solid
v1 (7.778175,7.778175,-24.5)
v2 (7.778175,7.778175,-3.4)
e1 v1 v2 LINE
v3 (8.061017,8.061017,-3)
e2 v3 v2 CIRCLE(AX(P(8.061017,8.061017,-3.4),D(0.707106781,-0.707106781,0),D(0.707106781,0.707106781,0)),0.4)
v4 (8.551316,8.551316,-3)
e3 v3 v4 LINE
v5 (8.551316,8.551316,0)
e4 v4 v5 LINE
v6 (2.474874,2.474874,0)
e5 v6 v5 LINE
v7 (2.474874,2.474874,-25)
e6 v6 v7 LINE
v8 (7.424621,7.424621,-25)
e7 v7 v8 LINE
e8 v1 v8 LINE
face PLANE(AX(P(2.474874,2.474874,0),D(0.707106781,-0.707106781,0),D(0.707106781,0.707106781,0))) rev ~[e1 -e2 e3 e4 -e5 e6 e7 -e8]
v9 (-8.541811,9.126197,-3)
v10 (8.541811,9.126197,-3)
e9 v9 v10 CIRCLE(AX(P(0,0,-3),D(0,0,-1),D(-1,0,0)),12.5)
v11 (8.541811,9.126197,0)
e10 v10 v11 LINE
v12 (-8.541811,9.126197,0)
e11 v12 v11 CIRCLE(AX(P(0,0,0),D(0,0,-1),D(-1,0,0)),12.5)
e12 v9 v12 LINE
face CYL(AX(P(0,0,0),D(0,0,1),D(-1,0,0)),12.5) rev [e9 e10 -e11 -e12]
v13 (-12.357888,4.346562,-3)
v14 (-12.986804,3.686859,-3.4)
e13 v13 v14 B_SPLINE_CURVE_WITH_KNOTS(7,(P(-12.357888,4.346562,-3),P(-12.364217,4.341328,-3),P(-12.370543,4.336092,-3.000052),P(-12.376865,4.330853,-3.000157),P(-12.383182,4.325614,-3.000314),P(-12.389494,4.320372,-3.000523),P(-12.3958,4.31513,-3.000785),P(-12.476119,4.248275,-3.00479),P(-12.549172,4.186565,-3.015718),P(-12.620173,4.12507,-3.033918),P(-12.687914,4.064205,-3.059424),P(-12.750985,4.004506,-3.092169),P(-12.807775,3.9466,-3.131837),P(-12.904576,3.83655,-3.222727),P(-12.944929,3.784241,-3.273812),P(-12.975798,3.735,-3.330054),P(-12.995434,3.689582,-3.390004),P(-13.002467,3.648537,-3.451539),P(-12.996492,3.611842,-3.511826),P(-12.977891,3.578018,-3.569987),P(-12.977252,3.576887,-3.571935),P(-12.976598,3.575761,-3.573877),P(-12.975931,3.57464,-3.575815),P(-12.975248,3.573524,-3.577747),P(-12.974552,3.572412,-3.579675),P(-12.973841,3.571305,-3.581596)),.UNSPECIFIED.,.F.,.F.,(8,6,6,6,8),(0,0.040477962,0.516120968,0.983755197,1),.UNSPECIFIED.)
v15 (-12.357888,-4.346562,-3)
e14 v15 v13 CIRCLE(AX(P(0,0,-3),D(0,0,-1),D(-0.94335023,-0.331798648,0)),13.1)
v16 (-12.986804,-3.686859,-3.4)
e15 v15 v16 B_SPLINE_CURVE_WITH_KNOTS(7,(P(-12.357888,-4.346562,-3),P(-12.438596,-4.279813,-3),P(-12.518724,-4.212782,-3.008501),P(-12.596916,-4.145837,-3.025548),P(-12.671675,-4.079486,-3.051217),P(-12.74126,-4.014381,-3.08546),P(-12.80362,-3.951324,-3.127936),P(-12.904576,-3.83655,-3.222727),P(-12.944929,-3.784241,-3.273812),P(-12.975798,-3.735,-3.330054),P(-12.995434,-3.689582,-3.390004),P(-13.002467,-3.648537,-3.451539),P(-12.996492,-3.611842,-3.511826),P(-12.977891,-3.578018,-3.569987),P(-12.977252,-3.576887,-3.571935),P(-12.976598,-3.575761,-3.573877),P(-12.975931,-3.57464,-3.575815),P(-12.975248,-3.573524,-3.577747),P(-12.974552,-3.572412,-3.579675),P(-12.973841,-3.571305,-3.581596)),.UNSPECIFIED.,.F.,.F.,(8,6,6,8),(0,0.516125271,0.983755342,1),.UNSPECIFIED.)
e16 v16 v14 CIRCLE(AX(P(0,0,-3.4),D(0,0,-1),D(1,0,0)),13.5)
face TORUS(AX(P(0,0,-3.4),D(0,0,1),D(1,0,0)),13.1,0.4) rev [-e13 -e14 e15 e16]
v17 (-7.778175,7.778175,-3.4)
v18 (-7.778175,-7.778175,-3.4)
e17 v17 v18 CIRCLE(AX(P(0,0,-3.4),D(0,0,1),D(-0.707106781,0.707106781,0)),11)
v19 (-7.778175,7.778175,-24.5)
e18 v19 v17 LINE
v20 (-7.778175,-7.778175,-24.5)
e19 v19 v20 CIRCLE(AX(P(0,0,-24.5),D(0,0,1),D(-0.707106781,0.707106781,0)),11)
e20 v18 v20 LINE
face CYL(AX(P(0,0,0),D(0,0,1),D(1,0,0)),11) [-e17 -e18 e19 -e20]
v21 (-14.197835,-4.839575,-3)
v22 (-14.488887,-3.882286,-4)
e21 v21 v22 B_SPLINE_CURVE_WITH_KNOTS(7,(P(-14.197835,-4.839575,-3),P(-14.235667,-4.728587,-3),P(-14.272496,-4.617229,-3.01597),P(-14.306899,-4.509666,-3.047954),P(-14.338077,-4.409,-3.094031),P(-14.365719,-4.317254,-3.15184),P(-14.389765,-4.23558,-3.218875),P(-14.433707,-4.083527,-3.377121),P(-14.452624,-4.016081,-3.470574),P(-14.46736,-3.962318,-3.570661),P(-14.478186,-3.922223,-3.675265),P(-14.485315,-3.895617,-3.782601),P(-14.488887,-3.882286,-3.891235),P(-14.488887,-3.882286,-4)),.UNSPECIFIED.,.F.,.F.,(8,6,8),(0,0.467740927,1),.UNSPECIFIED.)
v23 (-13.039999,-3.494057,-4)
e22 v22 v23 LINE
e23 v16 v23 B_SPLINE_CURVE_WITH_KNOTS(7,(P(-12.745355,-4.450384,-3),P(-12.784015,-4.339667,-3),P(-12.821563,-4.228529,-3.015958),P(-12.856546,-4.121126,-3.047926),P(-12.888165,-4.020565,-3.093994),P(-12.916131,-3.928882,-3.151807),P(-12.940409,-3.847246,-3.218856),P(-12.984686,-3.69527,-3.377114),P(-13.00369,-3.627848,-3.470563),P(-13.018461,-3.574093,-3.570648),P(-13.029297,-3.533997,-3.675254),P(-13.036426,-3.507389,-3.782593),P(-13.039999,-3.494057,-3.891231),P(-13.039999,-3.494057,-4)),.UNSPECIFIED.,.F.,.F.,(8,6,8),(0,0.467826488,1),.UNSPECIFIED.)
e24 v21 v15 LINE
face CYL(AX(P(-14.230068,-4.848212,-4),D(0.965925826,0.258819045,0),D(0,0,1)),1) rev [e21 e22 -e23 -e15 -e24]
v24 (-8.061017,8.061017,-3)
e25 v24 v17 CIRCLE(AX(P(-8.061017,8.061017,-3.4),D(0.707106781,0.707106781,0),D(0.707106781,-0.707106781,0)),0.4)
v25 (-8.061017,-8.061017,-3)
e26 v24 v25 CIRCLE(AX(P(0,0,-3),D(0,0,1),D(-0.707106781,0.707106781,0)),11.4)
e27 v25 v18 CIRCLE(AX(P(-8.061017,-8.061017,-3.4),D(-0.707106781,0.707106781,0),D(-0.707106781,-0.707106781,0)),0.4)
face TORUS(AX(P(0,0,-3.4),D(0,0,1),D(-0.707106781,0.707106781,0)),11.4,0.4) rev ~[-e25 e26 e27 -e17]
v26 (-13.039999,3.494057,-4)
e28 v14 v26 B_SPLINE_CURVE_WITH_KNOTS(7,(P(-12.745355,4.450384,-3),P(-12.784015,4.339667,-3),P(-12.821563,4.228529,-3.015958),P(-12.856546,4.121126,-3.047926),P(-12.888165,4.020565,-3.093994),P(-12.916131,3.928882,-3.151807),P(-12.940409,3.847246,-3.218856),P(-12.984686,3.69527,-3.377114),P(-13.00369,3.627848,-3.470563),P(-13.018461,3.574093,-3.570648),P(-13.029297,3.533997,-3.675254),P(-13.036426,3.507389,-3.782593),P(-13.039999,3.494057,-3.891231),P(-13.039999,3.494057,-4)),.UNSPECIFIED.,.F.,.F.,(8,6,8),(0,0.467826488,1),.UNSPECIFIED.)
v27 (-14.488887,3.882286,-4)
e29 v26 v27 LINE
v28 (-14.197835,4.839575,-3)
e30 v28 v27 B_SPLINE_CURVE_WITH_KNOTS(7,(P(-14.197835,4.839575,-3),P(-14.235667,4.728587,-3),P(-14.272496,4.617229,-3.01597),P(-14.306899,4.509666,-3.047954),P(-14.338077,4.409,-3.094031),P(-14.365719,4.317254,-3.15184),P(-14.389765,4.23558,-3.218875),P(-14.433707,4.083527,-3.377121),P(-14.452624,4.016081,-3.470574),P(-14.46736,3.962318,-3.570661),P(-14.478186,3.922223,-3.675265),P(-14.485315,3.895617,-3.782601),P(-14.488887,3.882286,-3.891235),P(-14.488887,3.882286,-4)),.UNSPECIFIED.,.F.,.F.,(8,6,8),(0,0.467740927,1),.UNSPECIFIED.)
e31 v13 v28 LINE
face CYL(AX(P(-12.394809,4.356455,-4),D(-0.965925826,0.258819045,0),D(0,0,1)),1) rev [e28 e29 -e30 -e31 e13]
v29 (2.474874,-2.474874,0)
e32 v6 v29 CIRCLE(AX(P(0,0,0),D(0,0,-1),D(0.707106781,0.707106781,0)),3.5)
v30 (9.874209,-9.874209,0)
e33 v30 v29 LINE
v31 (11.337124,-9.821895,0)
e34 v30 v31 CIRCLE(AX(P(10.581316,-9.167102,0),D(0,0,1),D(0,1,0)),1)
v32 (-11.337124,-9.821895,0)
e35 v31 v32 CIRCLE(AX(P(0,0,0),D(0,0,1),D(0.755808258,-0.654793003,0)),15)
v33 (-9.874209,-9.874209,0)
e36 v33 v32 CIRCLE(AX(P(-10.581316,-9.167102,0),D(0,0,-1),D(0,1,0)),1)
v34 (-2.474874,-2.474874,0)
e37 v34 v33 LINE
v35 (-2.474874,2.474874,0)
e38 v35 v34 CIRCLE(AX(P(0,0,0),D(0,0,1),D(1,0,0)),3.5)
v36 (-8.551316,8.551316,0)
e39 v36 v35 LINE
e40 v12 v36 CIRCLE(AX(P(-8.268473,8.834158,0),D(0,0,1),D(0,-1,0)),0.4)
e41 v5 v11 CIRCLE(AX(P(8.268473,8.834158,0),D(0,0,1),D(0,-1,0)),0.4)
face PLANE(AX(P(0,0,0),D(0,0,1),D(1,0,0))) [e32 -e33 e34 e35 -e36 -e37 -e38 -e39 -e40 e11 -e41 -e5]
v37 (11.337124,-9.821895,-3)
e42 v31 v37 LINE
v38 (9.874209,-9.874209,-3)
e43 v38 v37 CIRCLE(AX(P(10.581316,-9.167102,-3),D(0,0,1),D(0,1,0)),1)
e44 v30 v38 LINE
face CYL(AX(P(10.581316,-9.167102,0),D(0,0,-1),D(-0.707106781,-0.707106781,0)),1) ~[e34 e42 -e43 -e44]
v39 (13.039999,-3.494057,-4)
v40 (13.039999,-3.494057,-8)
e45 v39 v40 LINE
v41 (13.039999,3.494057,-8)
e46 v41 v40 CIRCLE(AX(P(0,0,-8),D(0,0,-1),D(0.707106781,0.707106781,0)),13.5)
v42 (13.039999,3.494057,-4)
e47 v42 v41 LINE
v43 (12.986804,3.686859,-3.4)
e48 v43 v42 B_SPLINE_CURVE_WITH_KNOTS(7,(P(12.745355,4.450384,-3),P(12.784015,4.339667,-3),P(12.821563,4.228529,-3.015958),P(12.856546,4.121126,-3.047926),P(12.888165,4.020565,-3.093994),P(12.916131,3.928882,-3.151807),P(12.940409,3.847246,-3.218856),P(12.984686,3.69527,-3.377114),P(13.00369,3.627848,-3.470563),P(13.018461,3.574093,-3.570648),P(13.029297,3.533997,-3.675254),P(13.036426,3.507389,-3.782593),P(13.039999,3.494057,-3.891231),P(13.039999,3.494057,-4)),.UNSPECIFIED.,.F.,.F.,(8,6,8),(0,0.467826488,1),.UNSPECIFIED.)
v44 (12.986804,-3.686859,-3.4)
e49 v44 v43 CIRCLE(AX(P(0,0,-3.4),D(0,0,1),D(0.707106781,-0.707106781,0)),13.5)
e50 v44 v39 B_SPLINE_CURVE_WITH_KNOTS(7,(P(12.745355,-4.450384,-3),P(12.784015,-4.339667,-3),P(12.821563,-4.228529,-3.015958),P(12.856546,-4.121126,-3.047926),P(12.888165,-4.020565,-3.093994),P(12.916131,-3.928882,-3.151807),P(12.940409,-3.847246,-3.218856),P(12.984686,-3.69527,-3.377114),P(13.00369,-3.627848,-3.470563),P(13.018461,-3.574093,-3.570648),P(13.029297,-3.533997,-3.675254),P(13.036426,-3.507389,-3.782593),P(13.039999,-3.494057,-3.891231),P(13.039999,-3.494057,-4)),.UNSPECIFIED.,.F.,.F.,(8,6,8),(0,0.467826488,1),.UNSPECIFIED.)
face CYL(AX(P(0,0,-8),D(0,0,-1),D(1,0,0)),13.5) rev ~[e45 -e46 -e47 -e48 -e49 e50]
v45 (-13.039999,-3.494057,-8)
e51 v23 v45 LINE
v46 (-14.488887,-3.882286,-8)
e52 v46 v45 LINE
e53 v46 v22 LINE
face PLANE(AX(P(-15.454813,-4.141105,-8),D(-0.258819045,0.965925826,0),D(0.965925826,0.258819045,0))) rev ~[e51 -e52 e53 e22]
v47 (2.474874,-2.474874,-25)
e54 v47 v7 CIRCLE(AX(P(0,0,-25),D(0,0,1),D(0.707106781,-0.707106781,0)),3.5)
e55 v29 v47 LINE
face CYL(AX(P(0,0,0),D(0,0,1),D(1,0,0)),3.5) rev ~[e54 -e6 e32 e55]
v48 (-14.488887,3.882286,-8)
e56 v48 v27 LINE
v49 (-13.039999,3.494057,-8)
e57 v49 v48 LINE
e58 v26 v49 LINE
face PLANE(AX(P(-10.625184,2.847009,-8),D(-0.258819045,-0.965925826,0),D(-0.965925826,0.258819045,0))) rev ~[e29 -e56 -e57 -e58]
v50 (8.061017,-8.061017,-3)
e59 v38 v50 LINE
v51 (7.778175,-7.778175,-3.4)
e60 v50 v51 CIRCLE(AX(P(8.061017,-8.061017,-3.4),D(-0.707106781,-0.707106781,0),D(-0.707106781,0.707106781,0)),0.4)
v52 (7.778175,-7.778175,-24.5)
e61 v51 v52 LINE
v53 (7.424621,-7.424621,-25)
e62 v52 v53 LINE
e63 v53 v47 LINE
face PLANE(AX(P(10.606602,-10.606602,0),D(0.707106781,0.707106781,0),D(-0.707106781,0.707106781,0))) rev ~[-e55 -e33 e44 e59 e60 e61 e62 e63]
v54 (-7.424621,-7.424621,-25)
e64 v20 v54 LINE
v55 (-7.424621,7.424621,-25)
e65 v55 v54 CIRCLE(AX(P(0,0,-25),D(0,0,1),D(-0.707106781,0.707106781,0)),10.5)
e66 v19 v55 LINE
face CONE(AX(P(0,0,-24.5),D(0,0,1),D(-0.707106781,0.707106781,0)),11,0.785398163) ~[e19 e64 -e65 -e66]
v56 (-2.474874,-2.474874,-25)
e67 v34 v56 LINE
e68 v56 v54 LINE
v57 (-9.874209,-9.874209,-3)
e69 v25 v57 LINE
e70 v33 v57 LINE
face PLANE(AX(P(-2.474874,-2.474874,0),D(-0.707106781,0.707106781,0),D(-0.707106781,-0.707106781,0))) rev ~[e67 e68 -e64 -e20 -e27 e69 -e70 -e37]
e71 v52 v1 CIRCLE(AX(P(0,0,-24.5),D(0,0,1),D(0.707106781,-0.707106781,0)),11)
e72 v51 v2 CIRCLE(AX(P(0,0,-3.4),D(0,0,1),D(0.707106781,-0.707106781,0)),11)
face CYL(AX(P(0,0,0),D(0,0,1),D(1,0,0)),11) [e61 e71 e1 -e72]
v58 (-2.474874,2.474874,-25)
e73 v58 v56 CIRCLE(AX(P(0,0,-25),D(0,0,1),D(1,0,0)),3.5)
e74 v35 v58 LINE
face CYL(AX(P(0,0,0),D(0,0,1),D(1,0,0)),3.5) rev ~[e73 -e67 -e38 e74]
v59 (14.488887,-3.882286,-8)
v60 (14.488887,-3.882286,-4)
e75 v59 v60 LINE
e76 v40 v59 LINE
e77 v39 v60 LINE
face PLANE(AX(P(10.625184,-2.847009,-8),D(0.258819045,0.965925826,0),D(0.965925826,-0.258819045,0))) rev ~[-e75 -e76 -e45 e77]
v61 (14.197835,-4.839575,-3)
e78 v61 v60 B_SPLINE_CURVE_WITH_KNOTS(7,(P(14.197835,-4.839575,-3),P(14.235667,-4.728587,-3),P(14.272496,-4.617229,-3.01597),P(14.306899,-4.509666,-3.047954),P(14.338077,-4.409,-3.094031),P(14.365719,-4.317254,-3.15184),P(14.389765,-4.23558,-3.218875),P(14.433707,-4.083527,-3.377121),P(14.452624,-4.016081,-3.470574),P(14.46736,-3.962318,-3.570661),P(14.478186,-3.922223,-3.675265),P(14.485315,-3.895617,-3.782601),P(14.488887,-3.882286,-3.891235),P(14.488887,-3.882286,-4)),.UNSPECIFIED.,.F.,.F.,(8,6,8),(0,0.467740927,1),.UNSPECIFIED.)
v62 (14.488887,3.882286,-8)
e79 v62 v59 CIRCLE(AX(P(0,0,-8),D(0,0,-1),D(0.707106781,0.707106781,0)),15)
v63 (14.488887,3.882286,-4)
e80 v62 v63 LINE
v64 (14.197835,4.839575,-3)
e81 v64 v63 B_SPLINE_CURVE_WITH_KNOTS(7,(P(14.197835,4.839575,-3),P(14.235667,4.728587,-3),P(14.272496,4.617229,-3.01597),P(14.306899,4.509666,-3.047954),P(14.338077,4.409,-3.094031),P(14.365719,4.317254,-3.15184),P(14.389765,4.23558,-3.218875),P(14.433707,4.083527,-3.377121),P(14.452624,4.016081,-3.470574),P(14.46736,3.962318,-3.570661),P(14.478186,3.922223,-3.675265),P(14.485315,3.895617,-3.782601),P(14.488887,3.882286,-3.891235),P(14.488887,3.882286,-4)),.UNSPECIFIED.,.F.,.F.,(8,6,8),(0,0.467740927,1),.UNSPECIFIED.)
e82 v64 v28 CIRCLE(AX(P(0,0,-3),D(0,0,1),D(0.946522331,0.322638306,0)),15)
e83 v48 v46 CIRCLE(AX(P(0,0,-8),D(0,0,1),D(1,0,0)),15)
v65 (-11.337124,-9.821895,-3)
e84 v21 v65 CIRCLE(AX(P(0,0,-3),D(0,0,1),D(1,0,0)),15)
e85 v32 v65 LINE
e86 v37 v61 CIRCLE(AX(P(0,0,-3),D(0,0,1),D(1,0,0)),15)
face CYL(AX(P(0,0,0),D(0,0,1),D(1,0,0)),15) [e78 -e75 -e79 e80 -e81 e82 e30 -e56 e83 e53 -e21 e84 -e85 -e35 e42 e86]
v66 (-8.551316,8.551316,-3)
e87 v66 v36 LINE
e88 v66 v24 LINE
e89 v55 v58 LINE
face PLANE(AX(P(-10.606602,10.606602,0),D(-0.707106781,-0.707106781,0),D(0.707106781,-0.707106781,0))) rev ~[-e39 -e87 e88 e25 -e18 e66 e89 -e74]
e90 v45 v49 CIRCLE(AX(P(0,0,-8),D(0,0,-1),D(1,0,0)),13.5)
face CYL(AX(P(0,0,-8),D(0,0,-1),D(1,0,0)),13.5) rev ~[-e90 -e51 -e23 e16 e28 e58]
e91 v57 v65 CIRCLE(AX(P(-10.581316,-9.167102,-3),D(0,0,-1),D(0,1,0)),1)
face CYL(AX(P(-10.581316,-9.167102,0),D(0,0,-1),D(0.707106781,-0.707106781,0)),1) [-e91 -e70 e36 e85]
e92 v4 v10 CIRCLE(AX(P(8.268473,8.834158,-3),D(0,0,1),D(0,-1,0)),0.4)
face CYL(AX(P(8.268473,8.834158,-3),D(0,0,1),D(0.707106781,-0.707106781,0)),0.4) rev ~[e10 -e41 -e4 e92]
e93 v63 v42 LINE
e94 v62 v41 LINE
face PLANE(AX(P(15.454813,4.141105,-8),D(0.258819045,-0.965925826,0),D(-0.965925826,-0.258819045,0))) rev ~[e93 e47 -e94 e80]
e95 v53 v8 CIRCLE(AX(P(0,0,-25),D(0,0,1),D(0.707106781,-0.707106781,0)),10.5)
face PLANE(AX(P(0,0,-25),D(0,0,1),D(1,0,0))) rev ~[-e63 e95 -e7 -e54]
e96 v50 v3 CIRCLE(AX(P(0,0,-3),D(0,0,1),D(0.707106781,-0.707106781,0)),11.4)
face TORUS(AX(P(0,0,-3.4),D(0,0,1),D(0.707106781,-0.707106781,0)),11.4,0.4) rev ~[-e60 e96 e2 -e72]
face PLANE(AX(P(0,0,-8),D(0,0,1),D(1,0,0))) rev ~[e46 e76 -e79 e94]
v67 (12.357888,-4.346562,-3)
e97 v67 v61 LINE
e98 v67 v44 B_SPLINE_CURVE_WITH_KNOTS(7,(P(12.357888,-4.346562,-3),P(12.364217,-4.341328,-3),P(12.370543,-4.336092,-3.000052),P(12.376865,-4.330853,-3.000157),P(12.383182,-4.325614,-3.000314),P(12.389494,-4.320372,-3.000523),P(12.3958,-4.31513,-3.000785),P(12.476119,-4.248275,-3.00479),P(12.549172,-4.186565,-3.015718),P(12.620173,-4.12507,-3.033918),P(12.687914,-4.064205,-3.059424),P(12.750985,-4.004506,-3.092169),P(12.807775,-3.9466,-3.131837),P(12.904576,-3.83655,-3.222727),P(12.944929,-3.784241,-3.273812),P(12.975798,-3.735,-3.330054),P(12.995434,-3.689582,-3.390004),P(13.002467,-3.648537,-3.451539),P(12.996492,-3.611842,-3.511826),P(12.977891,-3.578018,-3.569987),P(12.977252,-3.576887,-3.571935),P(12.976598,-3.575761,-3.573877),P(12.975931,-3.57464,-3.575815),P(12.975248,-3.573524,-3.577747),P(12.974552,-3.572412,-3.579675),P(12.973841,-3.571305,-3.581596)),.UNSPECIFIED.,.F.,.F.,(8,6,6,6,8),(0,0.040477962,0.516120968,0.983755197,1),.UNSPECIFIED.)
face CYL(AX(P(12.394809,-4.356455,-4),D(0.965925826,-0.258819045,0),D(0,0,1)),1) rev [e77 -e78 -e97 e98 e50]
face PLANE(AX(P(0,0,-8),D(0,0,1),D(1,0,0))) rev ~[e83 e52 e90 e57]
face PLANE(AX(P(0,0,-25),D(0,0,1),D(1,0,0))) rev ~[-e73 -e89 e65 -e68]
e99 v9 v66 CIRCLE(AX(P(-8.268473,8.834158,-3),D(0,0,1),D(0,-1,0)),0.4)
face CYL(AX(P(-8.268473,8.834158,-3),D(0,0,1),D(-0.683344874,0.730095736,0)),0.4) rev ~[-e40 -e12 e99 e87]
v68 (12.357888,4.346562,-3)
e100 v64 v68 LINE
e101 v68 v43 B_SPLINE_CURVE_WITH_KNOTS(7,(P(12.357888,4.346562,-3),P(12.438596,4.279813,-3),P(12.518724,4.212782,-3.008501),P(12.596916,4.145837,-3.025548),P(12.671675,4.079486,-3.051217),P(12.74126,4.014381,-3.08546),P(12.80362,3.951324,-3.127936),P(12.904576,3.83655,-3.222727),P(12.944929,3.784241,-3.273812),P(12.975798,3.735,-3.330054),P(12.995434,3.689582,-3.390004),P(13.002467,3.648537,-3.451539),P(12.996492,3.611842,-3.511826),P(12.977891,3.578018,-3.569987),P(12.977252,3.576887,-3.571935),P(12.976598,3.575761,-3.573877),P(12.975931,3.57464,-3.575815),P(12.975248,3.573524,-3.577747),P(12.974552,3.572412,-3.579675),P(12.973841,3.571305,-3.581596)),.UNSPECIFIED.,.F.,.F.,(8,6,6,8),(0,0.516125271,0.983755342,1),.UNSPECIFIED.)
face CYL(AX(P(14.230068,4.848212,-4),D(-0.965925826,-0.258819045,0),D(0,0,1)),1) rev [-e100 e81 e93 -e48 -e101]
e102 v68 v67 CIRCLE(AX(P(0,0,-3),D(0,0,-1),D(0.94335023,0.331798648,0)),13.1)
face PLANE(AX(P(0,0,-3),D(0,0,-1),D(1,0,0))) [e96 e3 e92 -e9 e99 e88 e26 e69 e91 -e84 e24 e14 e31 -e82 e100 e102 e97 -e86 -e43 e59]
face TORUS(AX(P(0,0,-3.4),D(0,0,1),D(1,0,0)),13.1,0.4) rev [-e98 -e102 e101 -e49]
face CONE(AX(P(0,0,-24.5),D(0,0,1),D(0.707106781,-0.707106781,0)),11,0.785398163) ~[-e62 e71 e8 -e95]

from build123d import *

# Parameters (mm, degrees)
F0_R      = 11
F0_R_2    = 3.5
F1_DEPTH  = 25
F2_R      = 15
F2_R_2    = 3.5
F3_DEPTH  = 8
F4_R      = 13.5
F4_R_2    = 11
F5_DEPTH  = 5
F6_R      = 0.4
F8_DEPTH  = 25
F10_DEPTH = 5
F12_R     = 1
F13_SIZE  = 0.5
F15_DEPTH = 3
F16_R     = 0.4


# Not quite as in the source:
# - a feature of the source that left no trace in its solid (it failed there, or was rolled back) is left out


with BuildPart() as f1:
    # F0 (on Top) → F1 (new body)
    with BuildSketch(Plane.XY):
        Circle(F0_R)
        Circle(F0_R_2, mode=Mode.SUBTRACT)
    extrude(amount=-F1_DEPTH)

    # F2 (on Top) → F3 (join)
    with BuildSketch(Plane.XY):
        Circle(F2_R)
        Circle(F2_R_2, mode=Mode.SUBTRACT)
    extrude(amount=-F3_DEPTH)

    # F4 (on face) → F5 (cut)
    with BuildSketch(Plane(origin=(0, 0, -8), x_dir=(1, 0, 0), z_dir=(0, 0, -1))):
        Circle(F4_R)
        Circle(F4_R_2, mode=Mode.SUBTRACT)
    extrude(amount=-F5_DEPTH, mode=Mode.SUBTRACT)

    # F6
    f6_edges = [f1.edges().sort_by_distance(p)[0] for p in [
        (-13.5, 0, -3),
    ]]
    fillet(f6_edges, radius=F6_R)

    # F7 (on Top) → F8 (cut)
    with BuildSketch(Plane.XY):
        with BuildLine():
            ThreePointArc((-2.4748737342, 2.4748737342), (0, 3.5), (2.4748737342, 2.4748737342))
            Line((2.4748737342, 2.4748737342), (10.6066017178, 10.6066017178))
            ThreePointArc((10.6066017178, 10.6066017178), (0, 15), (-10.6066017178, 10.6066017178))
            Line((-10.6066017178, 10.6066017178), (-2.4748737342, 2.4748737342))
        make_face()
        with BuildLine():
            Line((10.6066017178, -10.6066017178), (2.4748737342, -2.4748737342))
            ThreePointArc((2.4748737342, -2.4748737342), (0, -3.5), (-2.4748737342, -2.4748737342))
            Line((-2.4748737342, -2.4748737342), (-10.6066017178, -10.6066017178))
            ThreePointArc((-10.6066017178, -10.6066017178), (0, -15), (10.6066017178, -10.6066017178))
        make_face()
    extrude(amount=-F8_DEPTH, mode=Mode.SUBTRACT)

    # F9 (on face) → F10 (cut, through all)
    with BuildSketch(Plane(origin=(0, 0, -8), x_dir=(1, 0, 0), z_dir=(0, 0, -1))):
        with BuildLine():
            ThreePointArc((-10.6251840892, 2.8470094961), (0, 11), (10.6251840892, 2.8470094961))
            Line((10.6251840892, 2.8470094961), (15.4548132206, 4.1411047216))
            ThreePointArc((15.4548132206, 4.1411047216), (0, 16), (-15.4548132206, 4.1411047216))
            Line((-15.4548132206, 4.1411047216), (-10.6251840892, 2.8470094961))
        make_face()
        with BuildLine():
            Line((15.4548132206, -4.1411047216), (10.6251840892, -2.8470094961))
            ThreePointArc((10.6251840892, -2.8470094961), (0, -11), (-10.6251840892, -2.8470094961))
            Line((-10.6251840892, -2.8470094961), (-15.4548132206, -4.1411047216))
            ThreePointArc((-15.4548132206, -4.1411047216), (0, -16), (15.4548132206, -4.1411047216))
        make_face()
    extrude(amount=-F10_DEPTH, mode=Mode.SUBTRACT)

    # F12 (call 1 of 6: OpenCascade refuses the feature's edges together)
    f12_edges = [f1.edges().sort_by_distance(p)[0] for p in [
        (10.606602, -10.606602, -1.5),
    ]]
    fillet(f12_edges, radius=F12_R)

    # F12#2 (call 2 of 6)
    f12_2_edges = [f1.edges().sort_by_distance(p)[0] for p in [
        (-10.606602, -10.606602, -1.5),
    ]]
    fillet(f12_2_edges, radius=F12_R)

    # F12#3 (call 3 of 6)
    f12_3_edges = [f1.edges().sort_by_distance(p)[0] for p in [
        (13.571258, -3.636408, -3),
    ]]
    fillet(f12_3_edges, radius=F12_R)

    # F12#4 (call 4 of 6)
    f12_4_edges = [f1.edges().sort_by_distance(p)[0] for p in [
        (13.571258, 3.636408, -3),
    ]]
    fillet(f12_4_edges, radius=F12_R)

    # F12#5 (call 5 of 6)
    f12_5_edges = [f1.edges().sort_by_distance(p)[0] for p in [
        (-13.571258, -3.636408, -3),
    ]]
    fillet(f12_5_edges, radius=F12_R)

    # F12#6 (call 6 of 6)
    f12_6_edges = [f1.edges().sort_by_distance(p)[0] for p in [
        (-13.571258, 3.636408, -3),
    ]]
    fillet(f12_6_edges, radius=F12_R)

    # F13
    f13_edges = [f1.edges().sort_by_distance(p)[0] for p in [
        (-11, 0, -25),
        (11, 0, -25),
    ]]
    chamfer(f13_edges, length=F13_SIZE)

    # F14 (on Top) → F15 (join)
    with BuildSketch(Plane.XY):
        with BuildLine():
            Line((12.5, 0), (15, 0))
            ThreePointArc((15, 0), (0, 15), (-15, 0))
            Line((-15, 0), (-12.5, 0))
            ThreePointArc((-12.5, 0), (0, 12.5), (12.5, 0))
        make_face()
    extrude(amount=-F15_DEPTH)

    # F16
    f16_edges = [f1.edges().sort_by_distance(p)[0] for p in [
        (11, 0, -3),
        (-11, 0, -3),
        (-8.838835, 8.838835, -1.5),
        (8.838835, 8.838835, -1.5),
    ]]
    fillet(f16_edges, radius=F16_R)


solid = f1.part
